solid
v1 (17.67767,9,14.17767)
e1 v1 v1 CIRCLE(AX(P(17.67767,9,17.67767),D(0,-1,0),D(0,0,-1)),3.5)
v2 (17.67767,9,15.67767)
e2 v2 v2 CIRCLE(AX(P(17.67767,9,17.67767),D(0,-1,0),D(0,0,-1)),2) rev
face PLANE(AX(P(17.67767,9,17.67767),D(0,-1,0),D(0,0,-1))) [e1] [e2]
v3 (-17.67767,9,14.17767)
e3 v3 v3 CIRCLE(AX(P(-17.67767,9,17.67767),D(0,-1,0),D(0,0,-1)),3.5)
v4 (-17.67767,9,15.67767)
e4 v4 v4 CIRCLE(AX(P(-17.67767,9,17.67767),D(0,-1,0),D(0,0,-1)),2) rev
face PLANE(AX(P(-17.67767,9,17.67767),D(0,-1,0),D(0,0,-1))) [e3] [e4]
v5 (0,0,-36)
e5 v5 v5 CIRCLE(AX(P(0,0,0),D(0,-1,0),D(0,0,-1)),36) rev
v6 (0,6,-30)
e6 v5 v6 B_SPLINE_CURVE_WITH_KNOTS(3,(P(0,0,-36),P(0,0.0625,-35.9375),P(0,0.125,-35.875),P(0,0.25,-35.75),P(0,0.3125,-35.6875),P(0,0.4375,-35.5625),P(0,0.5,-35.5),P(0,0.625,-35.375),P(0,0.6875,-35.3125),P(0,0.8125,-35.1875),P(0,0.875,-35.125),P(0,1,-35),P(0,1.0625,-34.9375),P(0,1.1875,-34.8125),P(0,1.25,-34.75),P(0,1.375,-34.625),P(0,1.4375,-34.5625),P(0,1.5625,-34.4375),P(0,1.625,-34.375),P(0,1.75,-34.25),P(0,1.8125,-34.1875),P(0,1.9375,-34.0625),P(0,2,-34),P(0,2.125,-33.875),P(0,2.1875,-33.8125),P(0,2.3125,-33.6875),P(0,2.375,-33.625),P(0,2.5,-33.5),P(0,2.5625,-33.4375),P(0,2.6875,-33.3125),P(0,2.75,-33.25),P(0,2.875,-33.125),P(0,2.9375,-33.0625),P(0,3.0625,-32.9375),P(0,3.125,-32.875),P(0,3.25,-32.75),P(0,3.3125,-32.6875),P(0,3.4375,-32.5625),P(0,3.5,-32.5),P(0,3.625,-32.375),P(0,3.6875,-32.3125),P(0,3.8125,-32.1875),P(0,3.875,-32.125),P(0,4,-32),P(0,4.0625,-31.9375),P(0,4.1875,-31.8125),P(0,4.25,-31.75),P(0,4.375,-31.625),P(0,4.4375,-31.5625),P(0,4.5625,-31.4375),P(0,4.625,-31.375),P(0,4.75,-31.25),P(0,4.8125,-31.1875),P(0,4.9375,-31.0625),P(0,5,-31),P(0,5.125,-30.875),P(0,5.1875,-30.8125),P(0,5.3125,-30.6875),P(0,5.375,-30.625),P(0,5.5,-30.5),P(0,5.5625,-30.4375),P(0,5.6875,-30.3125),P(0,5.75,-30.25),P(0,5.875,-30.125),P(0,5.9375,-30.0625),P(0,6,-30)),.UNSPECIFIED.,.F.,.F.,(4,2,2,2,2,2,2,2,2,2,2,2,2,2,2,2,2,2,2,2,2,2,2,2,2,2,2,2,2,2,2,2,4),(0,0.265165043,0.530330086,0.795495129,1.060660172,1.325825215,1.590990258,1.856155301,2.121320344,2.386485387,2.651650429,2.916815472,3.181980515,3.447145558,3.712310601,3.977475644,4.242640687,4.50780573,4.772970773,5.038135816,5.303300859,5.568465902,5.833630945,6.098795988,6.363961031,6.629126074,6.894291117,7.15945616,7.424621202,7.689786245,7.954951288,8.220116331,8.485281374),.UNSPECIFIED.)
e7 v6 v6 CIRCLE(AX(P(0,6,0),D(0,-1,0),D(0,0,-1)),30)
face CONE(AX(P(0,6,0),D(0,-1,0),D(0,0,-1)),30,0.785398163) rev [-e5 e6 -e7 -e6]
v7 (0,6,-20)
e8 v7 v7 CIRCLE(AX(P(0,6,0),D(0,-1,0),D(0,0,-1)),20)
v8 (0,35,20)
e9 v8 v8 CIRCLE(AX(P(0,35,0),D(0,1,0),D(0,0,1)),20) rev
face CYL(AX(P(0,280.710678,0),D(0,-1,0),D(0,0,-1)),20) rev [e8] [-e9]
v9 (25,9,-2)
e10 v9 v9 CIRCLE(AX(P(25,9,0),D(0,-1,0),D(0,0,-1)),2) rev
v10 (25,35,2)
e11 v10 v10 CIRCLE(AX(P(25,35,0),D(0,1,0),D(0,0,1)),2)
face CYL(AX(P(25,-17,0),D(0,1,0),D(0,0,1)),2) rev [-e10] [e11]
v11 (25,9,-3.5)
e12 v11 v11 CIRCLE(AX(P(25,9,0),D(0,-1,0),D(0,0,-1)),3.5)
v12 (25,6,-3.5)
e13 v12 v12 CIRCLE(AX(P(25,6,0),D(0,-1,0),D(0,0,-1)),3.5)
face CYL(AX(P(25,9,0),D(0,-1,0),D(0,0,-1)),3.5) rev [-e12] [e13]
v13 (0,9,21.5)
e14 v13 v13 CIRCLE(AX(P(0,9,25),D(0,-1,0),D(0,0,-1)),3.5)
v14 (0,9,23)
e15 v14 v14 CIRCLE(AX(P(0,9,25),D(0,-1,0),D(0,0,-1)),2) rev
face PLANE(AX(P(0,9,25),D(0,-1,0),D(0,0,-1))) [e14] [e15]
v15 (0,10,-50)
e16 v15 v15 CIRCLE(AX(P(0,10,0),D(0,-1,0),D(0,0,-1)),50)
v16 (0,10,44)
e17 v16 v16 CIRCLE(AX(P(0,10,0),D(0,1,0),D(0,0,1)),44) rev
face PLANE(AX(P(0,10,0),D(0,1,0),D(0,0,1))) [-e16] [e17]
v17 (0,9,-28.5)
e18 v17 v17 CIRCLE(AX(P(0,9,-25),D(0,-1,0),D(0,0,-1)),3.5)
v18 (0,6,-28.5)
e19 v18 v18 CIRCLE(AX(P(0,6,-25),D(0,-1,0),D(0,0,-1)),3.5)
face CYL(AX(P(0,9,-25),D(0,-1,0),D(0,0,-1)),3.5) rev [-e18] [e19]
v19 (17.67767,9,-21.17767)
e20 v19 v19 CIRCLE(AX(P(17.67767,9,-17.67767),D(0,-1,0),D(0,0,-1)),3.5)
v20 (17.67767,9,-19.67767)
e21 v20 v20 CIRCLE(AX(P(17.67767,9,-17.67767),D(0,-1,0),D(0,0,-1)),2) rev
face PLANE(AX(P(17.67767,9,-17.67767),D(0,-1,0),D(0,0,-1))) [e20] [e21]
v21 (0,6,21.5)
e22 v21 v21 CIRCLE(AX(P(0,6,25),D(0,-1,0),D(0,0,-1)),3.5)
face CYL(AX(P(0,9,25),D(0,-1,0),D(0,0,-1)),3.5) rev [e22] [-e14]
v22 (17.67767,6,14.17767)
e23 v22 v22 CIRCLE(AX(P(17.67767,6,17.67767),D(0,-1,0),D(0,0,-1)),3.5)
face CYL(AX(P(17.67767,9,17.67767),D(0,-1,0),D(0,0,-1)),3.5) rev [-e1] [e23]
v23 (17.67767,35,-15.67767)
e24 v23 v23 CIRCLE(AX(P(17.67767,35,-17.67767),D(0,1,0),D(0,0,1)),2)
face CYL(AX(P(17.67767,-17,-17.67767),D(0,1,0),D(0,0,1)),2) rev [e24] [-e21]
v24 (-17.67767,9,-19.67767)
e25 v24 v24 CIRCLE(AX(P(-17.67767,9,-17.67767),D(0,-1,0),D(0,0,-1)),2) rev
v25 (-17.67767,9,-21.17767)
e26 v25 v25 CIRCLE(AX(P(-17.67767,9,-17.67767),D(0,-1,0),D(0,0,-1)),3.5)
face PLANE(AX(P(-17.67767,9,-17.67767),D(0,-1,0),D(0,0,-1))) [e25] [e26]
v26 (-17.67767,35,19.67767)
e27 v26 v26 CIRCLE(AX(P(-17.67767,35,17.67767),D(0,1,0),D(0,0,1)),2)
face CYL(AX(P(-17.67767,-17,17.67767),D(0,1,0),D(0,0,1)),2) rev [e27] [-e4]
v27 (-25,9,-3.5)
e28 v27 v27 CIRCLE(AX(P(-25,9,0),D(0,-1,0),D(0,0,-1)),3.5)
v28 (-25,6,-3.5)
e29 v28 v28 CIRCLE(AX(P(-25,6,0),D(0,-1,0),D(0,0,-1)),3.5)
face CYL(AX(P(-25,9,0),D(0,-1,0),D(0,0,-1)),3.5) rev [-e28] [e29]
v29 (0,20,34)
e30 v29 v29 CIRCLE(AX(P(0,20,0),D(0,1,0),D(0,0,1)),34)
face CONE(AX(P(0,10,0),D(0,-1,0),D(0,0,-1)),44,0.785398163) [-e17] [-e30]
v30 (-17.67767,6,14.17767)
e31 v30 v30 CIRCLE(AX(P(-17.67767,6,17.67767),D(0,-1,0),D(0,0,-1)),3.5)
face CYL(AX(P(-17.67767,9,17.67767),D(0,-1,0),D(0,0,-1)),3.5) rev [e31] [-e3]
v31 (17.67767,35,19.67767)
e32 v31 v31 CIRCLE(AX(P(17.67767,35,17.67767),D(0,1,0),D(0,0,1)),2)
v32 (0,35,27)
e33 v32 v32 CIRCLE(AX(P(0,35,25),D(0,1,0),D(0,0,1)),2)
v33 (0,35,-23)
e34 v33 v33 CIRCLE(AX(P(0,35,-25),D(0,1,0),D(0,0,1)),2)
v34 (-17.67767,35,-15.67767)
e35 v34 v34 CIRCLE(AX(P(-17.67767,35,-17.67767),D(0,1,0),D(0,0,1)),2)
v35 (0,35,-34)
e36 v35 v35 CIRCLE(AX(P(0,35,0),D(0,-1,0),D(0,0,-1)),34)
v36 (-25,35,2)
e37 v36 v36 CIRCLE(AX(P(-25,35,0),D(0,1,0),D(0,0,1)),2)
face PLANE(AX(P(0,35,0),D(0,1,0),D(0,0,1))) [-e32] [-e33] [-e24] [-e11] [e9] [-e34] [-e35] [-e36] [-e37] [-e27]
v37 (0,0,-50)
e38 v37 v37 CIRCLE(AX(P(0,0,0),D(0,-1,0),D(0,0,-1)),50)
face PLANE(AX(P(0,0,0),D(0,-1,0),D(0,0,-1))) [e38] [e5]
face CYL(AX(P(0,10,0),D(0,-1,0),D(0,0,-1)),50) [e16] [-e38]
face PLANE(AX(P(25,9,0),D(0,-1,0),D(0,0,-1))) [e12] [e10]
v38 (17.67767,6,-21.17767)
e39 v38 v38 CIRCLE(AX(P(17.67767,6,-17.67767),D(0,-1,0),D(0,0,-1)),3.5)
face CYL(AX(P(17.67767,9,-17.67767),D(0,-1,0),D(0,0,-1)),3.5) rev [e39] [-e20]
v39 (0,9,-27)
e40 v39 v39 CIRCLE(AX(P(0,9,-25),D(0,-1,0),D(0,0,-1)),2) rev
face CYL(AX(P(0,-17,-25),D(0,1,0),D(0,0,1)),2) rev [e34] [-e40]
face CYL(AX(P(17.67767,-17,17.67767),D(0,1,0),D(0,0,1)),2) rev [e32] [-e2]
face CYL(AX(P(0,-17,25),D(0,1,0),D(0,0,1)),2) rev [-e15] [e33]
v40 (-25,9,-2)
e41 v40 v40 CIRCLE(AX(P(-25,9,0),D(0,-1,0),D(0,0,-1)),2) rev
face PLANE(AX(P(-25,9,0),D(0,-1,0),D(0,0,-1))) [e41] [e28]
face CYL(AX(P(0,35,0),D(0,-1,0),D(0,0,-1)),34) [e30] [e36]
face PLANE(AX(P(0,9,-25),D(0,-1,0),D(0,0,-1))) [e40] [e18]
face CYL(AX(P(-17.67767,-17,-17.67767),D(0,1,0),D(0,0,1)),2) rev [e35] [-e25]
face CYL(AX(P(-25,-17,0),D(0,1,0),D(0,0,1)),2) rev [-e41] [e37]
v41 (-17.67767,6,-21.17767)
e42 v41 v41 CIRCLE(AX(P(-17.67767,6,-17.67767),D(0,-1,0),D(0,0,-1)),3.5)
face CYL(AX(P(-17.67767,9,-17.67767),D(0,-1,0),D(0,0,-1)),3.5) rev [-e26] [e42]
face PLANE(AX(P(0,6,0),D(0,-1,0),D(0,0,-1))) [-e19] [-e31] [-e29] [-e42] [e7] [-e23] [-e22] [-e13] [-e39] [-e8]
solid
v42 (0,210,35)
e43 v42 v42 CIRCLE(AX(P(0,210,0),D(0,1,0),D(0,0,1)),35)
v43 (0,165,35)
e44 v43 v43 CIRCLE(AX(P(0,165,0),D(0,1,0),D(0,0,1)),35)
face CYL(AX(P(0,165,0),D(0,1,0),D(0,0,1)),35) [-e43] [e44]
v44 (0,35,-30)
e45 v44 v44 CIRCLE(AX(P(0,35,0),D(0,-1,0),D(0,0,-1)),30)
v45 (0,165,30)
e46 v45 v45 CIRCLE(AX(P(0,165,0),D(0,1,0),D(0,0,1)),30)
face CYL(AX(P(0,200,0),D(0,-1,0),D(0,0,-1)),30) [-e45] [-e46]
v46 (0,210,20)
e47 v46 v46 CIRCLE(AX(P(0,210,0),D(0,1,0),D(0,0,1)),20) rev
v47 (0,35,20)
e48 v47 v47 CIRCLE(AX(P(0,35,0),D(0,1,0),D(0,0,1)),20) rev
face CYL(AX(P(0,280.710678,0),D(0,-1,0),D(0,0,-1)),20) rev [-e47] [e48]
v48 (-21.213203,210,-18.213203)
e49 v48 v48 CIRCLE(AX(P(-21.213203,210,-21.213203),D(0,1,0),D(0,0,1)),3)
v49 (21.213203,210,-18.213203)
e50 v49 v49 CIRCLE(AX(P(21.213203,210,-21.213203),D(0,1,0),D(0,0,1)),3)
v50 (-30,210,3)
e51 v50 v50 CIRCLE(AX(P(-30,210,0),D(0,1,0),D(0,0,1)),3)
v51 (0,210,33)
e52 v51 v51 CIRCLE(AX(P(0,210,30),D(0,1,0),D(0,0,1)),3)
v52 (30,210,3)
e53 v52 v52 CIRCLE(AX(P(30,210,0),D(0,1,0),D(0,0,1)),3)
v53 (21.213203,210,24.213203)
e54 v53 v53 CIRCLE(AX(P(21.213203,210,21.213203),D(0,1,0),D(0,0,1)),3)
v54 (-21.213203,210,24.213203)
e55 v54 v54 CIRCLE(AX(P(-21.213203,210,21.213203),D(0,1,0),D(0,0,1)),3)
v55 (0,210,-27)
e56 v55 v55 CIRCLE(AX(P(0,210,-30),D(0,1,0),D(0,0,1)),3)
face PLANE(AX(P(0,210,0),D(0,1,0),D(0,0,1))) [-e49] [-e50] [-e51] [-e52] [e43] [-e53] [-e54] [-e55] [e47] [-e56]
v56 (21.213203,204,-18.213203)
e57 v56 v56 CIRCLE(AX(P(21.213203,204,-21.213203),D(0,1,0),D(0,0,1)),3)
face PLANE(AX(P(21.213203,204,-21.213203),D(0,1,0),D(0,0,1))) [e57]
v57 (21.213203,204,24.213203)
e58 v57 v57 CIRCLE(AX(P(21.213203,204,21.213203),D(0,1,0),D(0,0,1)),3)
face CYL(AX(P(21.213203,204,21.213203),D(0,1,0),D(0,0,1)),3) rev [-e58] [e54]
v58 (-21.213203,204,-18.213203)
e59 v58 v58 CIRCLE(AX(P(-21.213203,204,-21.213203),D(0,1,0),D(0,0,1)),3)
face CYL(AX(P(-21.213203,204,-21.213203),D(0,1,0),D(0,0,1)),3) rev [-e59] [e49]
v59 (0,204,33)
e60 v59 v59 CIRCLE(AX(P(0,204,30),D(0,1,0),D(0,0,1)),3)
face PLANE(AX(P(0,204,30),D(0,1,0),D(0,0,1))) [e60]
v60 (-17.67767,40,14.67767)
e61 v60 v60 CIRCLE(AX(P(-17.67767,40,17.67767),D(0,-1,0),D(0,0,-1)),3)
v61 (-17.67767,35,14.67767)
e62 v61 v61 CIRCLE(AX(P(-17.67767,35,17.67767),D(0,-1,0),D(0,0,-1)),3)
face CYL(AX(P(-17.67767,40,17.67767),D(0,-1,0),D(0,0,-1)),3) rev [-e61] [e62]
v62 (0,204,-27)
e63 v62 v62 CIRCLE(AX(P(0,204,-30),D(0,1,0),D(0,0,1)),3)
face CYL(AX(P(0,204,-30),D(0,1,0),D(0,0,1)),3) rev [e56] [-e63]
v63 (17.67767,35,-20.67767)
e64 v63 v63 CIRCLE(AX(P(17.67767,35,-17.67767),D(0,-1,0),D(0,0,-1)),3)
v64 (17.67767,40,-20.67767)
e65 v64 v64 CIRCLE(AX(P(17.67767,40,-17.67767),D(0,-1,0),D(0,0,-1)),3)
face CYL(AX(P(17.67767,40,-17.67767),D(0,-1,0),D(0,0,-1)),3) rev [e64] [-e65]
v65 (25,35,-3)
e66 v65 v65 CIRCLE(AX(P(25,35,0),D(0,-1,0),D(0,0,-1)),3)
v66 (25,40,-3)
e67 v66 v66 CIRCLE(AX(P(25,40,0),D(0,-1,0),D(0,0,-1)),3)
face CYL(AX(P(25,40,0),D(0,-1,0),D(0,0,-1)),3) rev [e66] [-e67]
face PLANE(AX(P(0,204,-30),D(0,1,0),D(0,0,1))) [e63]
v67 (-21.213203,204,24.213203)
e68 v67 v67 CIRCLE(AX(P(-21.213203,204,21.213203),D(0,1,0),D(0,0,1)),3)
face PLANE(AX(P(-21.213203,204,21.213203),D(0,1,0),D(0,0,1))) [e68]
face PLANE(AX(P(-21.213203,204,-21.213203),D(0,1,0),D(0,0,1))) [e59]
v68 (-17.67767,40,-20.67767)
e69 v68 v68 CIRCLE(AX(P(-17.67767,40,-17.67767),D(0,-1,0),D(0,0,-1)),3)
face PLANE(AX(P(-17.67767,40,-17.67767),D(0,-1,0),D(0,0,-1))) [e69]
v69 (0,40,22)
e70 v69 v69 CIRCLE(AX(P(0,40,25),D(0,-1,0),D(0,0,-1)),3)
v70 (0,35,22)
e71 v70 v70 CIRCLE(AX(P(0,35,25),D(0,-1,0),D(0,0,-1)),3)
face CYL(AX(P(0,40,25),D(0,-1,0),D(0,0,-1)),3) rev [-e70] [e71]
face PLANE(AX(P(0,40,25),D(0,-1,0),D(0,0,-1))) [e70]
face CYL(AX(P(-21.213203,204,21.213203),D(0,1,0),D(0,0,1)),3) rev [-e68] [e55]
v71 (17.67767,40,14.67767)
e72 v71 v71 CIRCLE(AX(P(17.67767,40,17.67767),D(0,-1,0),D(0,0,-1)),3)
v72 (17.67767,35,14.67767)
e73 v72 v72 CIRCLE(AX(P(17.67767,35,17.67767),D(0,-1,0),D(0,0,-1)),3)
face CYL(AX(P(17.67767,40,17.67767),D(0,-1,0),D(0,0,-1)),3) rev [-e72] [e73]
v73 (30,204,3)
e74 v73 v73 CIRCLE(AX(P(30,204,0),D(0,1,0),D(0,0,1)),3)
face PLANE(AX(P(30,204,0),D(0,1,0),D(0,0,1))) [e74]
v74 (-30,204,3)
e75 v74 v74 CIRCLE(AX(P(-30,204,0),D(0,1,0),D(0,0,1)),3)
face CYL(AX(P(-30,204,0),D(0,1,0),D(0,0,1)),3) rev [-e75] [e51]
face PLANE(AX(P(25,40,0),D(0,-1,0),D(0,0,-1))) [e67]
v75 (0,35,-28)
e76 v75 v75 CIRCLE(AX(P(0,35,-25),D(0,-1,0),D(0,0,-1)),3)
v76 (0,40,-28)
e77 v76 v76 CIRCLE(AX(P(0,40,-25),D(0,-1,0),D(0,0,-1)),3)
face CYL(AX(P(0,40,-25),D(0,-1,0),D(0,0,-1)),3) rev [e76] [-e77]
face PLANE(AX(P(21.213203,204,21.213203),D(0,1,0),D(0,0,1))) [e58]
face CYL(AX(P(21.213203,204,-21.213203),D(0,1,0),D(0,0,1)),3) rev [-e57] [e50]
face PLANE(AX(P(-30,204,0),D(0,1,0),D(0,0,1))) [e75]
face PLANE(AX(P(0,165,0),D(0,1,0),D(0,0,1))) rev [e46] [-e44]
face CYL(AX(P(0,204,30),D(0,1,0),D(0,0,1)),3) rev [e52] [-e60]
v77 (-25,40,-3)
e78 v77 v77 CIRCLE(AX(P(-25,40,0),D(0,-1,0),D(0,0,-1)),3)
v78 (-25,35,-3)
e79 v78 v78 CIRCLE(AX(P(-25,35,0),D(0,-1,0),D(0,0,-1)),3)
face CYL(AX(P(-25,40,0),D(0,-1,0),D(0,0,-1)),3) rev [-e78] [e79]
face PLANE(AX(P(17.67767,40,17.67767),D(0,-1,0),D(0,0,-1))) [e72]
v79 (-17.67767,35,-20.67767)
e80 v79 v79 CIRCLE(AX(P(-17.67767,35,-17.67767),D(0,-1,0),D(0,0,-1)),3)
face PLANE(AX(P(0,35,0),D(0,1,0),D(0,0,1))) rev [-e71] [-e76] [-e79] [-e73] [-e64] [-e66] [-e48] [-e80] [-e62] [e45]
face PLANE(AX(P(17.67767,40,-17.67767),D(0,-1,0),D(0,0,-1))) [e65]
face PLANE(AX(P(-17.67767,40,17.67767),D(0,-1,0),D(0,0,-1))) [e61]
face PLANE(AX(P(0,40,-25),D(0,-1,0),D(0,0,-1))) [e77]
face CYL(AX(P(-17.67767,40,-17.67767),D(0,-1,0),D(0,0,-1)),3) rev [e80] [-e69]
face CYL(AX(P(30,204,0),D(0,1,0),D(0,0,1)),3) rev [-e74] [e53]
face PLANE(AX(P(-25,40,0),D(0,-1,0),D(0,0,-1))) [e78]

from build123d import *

# Parameters (mm, degrees)
SKETCH1_R                = 30
SKETCH1_R_2              = 25
BOSS_EXTRUDE1_DEPTH      = 200
SKETCH3_R                = 50
SKETCH3_R_2              = 25
BOSS_EXTRUDE3_DEPTH      = 10
BOSS_EXTRUDE4_DEPTH      = 10
BOSS_EXTRUDE4_DEPTH_BACK = 35
SKETCH4_R                = 35
SKETCH4_R_2              = 25
SKETCH5_R                = 3
CUT_EXTRUDE1_DEPTH       = 6
SKETCH7_R                = 34
SKETCH7_R_2              = 25
BOSS_EXTRUDE5_DEPTH      = 25
SKETCH9_R                = 25
SKETCH9_R_2              = 20
BOSS_EXTRUDE7_DEPTH      = 210
SKETCH10_R               = 3
CUT_EXTRUDE2_DEPTH       = 5
SKETCH11_R               = 2
CUT_EXTRUDE3_DEPTH       = 52
SKETCH12_R               = 30
SKETCH12_R_2             = 20
CUT_EXTRUDE6_DEPTH       = 6
CHAMFER5_SIZE            = 6
SKETCH14_R               = 3.5
CUT_EXTRUDE7_DEPTH       = 3
CHAMFER6_SIZE            = 10


# Read off the part's stored shape, not the designer's step: Intersect1, Intersect2, Intersect3
with BuildPart() as part:
    # Sketch1 → Boss-Extrude1 (new body)
    with BuildSketch(Plane(origin=(0, 0, 0), x_dir=(1, 0, 0), z_dir=(0, 1, 0))):
        with Locations(Location((0, 0, 0), (0, 0, 270))):
            Circle(SKETCH1_R)
        with Locations(Location((0, 0, 0), (0, 0, 270))):
            Circle(SKETCH1_R_2, mode=Mode.SUBTRACT)
    extrude(amount=BOSS_EXTRUDE1_DEPTH)

    # Sketch3 → Boss-Extrude3 (add)
    with BuildSketch(Plane.XZ):
        with Locations(Location((0, 0, 0), (0, 0, 270))):
            Circle(SKETCH3_R)
        with Locations(Location((0, 0, 0), (0, 0, 90))):
            Circle(SKETCH3_R_2, mode=Mode.SUBTRACT)
    extrude(amount=-BOSS_EXTRUDE3_DEPTH)

    # Sketch4 → Boss-Extrude4 (add, two sides: drawn at the far end of the back side and taken through both)
    with BuildSketch(Plane(origin=(0, 200, 0), x_dir=(1, 0, 0), z_dir=(0, 1, 0)).offset(-BOSS_EXTRUDE4_DEPTH_BACK)):
        with Locations(Location((0, 0, 0), (0, 0, 270))):
            Circle(SKETCH4_R)
        with Locations(Location((0, 0, 0), (0, 0, 270))):
            Circle(SKETCH4_R_2, mode=Mode.SUBTRACT)
    extrude(amount=BOSS_EXTRUDE4_DEPTH + BOSS_EXTRUDE4_DEPTH_BACK)

    # Sketch5 → Cut-Extrude1 (cut)
    with BuildSketch(Plane(origin=(0, 210, 0), x_dir=(1, 0, 0), z_dir=(0, 1, 0))):
        with Locations(Location((-30, 0, 0), (0, 0, 270))):
            Circle(SKETCH5_R)
        with Locations(Location((-21.213203436, 21.213203436, 0), (0, 0, 270))):
            Circle(SKETCH5_R)
        with Locations(Location((0, 30, 0), (0, 0, 270))):
            Circle(SKETCH5_R)
        with Locations(Location((21.213203436, 21.213203436, 0), (0, 0, 270))):
            Circle(SKETCH5_R)
        with Locations(Location((30, 0, 0), (0, 0, 270))):
            Circle(SKETCH5_R)
        with Locations(Location((21.213203436, -21.213203436, 0), (0, 0, 270))):
            Circle(SKETCH5_R)
        with Locations(Location((0, -30, 0), (0, 0, 270))):
            Circle(SKETCH5_R)
        with Locations(Location((-21.213203436, -21.213203436, 0), (0, 0, 270))):
            Circle(SKETCH5_R)
    extrude(amount=-CUT_EXTRUDE1_DEPTH, mode=Mode.SUBTRACT)


with BuildPart() as body_2:
    # Intersect1: the piece on the far side of the plane
    add(part.part)
    split(bisect_by=Plane(origin=(0, 10, 0), x_dir=(1, 0, 0), z_dir=(0, 1, 0)), keep=Keep.BOTTOM)


with BuildPart() as part_1:
    add(part.part)

    # Intersect1
    split(bisect_by=Plane(origin=(0, 10, 0), x_dir=(1, 0, 0), z_dir=(0, 1, 0)), keep=Keep.TOP)

    # Sketch7 → Boss-Extrude5 (add)
    with BuildSketch(Plane.XZ.offset(-10)):
        with Locations(Location((0, 0, 0), (0, 0, 270))):
            Circle(SKETCH7_R)
        with Locations(Location((0, 0, 0), (0, 0, 90))):
            Circle(SKETCH7_R_2, mode=Mode.SUBTRACT)
    extrude(amount=-BOSS_EXTRUDE5_DEPTH)

    # Combine1: union body 2
    add(body_2.part)


with BuildPart() as body_2_2:
    # Intersect2: the piece on the far side of the plane
    add(part_1.part)
    split(bisect_by=Plane(origin=(0, 35, 0), x_dir=(1, 0, 0), z_dir=(0, 1, 0)), keep=Keep.BOTTOM)


with BuildPart() as part_2:
    add(part_1.part)

    # Intersect2
    split(bisect_by=Plane(origin=(0, 35, 0), x_dir=(1, 0, 0), z_dir=(0, 1, 0)), keep=Keep.TOP)


with BuildPart() as body_3:
    # Sketch9 → Boss-Extrude7 (new body)
    with BuildSketch(Plane.XZ):
        with Locations(Location((0, 0, 0), (0, 0, 90))):
            Circle(SKETCH9_R)
        with Locations(Location((0, 0, 0), (0, 0, 270))):
            Circle(SKETCH9_R_2, mode=Mode.SUBTRACT)
    extrude(amount=-BOSS_EXTRUDE7_DEPTH)


with BuildPart() as body_4:
    # Intersect3: the piece on the far side of the plane
    add(body_3.part)
    split(bisect_by=Plane(origin=(0, 35, 0), x_dir=(1, 0, 0), z_dir=(0, 1, 0)), keep=Keep.BOTTOM)

    # Combine2: union body 2 2
    add(body_2_2.part)

    # Sketch11 → Cut-Extrude3 (cut)
    with BuildSketch(Plane(origin=(0, 35, 0), x_dir=(1, 0, 0), z_dir=(0, 1, 0))):
        with Locations(Location((-25, 0, 0), (0, 0, 270))):
            Circle(SKETCH11_R)
        with Locations(Location((-17.67766953, 17.67766953, 0), (0, 0, 270))):
            Circle(SKETCH11_R)
        with Locations(Location((0, 25, 0), (0, 0, 270))):
            Circle(SKETCH11_R)
        with Locations(Location((17.67766953, 17.67766953, 0), (0, 0, 270))):
            Circle(SKETCH11_R)
        with Locations(Location((25, 0, 0), (0, 0, 270))):
            Circle(SKETCH11_R)
        with Locations(Location((17.67766953, -17.67766953, 0), (0, 0, 270))):
            Circle(SKETCH11_R)
        with Locations(Location((0, -25, 0), (0, 0, 270))):
            Circle(SKETCH11_R)
        with Locations(Location((-17.67766953, -17.67766953, 0), (0, 0, 270))):
            Circle(SKETCH11_R)
    extrude(amount=-CUT_EXTRUDE3_DEPTH, mode=Mode.SUBTRACT)

    # Sketch12 → Cut-Extrude6 (cut)
    with BuildSketch(Plane.XZ):
        with Locations(Location((0, 0, 0), (0, 0, 270))):
            Circle(SKETCH12_R)
        with Locations(Location((0, 0, 0), (0, 0, 90))):
            Circle(SKETCH12_R_2, mode=Mode.SUBTRACT)
    extrude(amount=-CUT_EXTRUDE6_DEPTH, mode=Mode.SUBTRACT)

    # Chamfer5
    chamfer5_edges = [body_4.edges().sort_by_distance(p)[0] for p in [
        (0, 0, 30),
    ]]
    chamfer(chamfer5_edges, length=CHAMFER5_SIZE - 0.0001)  # a hair under: the kernel refuses the full size

    # Sketch14 → Cut-Extrude7 (cut)
    with BuildSketch(Plane.XZ.offset(-6)):
        with Locations(Location((-25, 0, 0), (0, 0, 270))):
            Circle(SKETCH14_R)
        with Locations(Location((-17.67766953, 17.67766953, 0), (0, 0, 270))):
            Circle(SKETCH14_R)
        with Locations(Location((0, 25, 0), (0, 0, 270))):
            Circle(SKETCH14_R)
        with Locations(Location((17.67766953, 17.67766953, 0), (0, 0, 270))):
            Circle(SKETCH14_R)
        with Locations(Location((25, 0, 0), (0, 0, 270))):
            Circle(SKETCH14_R)
        with Locations(Location((17.67766953, -17.67766953, 0), (0, 0, 270))):
            Circle(SKETCH14_R)
        with Locations(Location((0, -25, 0), (0, 0, 270))):
            Circle(SKETCH14_R)
        with Locations(Location((-17.67766953, -17.67766953, 0), (0, 0, 270))):
            Circle(SKETCH14_R)
    extrude(amount=-CUT_EXTRUDE7_DEPTH, mode=Mode.SUBTRACT)

    # Chamfer6
    chamfer6_edges = [body_4.edges().sort_by_distance(p)[0] for p in [
        (0, 10, 34),
    ]]
    chamfer(chamfer6_edges, length=CHAMFER6_SIZE)


with BuildPart() as body_3_1:
    add(body_3.part)

    # Intersect3
    split(bisect_by=Plane(origin=(0, 35, 0), x_dir=(1, 0, 0), z_dir=(0, 1, 0)), keep=Keep.TOP)

    # Combine3: union part
    add(part_2.part)

    # Sketch10 → Cut-Extrude2 (cut)
    with BuildSketch(Plane.XZ.offset(-35)):
        with Locations(Location((-25, 0, 0), (0, 0, 270))):
            Circle(SKETCH10_R)
        with Locations(Location((-17.67766953, 17.67766953, 0), (0, 0, 270))):
            Circle(SKETCH10_R)
        with Locations(Location((0, 25, 0), (0, 0, 270))):
            Circle(SKETCH10_R)
        with Locations(Location((17.67766953, 17.67766953, 0), (0, 0, 270))):
            Circle(SKETCH10_R)
        with Locations(Location((25, 0, 0), (0, 0, 270))):
            Circle(SKETCH10_R)
        with Locations(Location((17.67766953, -17.67766953, 0), (0, 0, 270))):
            Circle(SKETCH10_R)
        with Locations(Location((0, -25, 0), (0, 0, 270))):
            Circle(SKETCH10_R)
        with Locations(Location((-17.67766953, -17.67766953, 0), (0, 0, 270))):
            Circle(SKETCH10_R)
    extrude(amount=-CUT_EXTRUDE2_DEPTH, mode=Mode.SUBTRACT)


solid = Compound([body_4.part, body_3_1.part])
